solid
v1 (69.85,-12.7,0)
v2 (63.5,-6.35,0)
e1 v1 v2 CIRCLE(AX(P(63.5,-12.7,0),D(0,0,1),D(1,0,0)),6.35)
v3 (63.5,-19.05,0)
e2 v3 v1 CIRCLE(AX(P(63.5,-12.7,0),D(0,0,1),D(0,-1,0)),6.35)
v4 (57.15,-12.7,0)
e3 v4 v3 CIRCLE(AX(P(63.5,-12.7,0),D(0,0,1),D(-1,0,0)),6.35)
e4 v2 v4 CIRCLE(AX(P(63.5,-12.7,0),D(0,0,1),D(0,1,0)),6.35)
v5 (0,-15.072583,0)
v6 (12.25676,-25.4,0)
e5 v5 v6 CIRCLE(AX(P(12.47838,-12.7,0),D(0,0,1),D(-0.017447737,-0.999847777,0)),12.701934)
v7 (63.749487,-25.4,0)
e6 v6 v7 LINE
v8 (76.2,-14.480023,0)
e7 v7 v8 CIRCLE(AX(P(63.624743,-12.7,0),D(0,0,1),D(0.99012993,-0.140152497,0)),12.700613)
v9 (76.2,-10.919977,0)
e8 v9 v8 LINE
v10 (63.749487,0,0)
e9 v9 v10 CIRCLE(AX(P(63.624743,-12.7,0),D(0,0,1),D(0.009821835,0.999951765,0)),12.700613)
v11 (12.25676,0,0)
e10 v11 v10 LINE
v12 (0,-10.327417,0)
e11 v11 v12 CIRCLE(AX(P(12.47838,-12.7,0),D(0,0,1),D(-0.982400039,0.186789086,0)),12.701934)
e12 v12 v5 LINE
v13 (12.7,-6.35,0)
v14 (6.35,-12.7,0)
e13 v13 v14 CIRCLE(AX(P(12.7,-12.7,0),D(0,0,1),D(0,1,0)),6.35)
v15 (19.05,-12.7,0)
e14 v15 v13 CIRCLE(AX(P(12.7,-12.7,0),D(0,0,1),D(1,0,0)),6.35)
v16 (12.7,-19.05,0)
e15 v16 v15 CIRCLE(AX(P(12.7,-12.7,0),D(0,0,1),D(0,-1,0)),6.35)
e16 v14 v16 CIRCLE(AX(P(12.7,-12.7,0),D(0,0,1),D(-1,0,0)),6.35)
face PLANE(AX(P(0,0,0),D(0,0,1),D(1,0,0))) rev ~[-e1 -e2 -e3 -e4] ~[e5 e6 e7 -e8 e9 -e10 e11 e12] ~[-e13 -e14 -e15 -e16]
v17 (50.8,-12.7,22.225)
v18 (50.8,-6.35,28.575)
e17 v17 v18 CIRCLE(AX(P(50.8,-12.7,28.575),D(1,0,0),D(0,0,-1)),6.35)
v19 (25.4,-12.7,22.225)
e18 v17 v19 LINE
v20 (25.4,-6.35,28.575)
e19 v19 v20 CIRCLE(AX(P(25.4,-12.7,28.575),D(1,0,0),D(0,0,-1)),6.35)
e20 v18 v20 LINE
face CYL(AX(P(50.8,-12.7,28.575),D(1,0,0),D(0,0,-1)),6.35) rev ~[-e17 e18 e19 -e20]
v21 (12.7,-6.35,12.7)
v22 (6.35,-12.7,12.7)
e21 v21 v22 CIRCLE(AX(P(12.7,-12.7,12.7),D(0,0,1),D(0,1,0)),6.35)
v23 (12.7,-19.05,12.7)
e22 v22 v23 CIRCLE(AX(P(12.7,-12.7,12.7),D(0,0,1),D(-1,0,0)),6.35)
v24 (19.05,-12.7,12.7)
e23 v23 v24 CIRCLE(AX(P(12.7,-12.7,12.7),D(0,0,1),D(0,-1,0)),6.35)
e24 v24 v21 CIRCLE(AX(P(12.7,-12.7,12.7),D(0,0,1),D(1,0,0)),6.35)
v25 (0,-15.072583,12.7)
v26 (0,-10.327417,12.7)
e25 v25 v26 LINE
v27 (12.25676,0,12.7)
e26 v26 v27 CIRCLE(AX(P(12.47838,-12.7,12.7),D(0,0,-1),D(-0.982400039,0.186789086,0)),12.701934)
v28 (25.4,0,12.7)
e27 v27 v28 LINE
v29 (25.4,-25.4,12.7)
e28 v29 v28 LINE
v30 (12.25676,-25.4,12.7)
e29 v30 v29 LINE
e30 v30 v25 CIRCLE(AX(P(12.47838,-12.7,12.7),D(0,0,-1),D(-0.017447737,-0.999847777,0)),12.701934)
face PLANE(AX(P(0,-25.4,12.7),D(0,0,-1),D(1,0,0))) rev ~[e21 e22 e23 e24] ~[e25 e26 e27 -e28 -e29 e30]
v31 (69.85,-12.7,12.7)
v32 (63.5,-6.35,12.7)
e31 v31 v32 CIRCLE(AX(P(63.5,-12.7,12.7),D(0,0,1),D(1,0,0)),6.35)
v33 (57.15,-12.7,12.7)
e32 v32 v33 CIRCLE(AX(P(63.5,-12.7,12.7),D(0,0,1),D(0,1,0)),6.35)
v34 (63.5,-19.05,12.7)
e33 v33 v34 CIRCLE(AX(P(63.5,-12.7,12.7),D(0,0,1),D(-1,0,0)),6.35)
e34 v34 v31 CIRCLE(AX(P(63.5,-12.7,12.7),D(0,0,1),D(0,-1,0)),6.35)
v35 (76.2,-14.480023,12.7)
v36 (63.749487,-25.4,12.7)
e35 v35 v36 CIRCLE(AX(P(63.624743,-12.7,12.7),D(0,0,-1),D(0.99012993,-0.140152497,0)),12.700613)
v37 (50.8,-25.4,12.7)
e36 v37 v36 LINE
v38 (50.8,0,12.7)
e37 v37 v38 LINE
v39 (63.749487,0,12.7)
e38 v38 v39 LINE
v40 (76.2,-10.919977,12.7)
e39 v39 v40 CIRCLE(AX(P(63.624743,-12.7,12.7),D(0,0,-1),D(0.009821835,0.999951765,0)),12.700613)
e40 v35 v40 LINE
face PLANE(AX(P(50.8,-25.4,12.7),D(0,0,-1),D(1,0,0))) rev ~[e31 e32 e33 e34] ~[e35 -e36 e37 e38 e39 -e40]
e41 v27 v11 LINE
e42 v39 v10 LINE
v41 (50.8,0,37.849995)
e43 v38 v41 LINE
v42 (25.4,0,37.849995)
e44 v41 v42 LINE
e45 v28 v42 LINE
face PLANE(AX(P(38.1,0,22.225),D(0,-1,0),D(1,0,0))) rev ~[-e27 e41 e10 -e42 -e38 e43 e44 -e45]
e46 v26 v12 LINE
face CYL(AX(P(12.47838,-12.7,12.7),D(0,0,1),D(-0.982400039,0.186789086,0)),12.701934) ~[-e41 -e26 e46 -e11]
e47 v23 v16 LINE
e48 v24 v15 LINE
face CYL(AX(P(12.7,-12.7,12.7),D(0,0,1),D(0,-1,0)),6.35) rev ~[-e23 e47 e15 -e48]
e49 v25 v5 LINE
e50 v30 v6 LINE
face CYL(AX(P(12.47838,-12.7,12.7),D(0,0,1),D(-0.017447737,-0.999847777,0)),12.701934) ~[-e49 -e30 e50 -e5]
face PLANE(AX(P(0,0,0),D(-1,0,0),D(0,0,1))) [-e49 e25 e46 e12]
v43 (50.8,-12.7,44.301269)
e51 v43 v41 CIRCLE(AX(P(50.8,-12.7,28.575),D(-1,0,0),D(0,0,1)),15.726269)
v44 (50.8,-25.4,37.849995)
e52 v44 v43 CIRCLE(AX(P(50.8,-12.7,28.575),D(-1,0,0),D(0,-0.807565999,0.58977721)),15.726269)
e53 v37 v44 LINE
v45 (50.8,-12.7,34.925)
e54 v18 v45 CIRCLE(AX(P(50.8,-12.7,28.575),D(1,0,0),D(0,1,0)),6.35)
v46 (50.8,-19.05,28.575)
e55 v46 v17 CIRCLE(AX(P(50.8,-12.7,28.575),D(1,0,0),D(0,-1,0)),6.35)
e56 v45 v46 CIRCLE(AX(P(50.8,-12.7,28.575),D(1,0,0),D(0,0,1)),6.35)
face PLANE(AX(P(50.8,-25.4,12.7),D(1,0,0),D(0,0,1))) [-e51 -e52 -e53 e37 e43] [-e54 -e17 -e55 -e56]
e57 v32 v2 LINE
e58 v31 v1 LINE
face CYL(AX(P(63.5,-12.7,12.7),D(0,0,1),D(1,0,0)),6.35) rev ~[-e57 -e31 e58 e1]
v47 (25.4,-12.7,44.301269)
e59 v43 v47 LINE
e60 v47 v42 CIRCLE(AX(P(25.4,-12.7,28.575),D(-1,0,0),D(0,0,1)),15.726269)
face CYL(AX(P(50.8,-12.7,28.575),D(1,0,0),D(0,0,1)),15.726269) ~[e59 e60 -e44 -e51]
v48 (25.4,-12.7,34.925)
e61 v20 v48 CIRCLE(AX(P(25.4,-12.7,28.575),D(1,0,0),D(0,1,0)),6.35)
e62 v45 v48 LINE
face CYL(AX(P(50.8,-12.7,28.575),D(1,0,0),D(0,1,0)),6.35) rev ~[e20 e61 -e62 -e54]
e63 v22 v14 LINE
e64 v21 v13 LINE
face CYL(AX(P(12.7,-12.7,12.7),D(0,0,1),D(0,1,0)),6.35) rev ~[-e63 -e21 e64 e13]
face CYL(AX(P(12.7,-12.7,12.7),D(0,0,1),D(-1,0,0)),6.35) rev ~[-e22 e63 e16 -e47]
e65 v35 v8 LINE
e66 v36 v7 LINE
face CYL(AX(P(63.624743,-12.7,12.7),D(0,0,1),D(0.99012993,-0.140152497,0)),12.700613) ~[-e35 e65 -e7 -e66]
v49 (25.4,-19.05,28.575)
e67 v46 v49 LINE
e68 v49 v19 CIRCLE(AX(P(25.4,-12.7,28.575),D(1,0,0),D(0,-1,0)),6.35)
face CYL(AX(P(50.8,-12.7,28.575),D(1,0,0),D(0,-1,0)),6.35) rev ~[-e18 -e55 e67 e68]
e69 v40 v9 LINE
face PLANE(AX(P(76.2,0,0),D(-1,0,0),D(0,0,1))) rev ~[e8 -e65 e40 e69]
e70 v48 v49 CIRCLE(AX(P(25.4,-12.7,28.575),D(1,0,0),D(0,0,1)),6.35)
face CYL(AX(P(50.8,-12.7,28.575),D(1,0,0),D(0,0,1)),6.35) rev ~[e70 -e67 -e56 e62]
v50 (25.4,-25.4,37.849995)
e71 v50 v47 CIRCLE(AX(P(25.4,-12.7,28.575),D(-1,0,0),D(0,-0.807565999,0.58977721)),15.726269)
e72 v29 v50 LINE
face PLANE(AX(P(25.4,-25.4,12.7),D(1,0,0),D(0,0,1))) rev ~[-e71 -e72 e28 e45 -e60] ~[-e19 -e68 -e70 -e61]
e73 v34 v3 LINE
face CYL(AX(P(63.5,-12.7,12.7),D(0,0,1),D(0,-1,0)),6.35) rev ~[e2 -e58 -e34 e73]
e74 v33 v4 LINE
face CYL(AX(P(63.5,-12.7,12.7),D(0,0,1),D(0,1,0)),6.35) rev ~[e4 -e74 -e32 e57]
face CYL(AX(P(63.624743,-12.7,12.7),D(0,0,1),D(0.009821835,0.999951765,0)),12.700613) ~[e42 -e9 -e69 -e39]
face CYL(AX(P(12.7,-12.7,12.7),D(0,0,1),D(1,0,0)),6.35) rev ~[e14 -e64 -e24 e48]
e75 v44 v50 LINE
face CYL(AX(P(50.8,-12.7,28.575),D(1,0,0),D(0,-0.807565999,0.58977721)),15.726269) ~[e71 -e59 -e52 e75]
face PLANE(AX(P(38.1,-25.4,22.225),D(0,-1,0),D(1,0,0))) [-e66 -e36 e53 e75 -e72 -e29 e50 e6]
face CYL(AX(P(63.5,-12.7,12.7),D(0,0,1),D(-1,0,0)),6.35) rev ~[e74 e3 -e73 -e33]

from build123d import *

# Parameters (mm, degrees)
F0_W     = 76.2
F0_H     = 44.45
F1_DEPTH = 25.4
F2_W     = 25.4
F2_H     = 31.75
F3_DEPTH = 25.4
F5_DEPTH = 25.4
F7_DEPTH = 25.4
F9_DEPTH = 25.4


with BuildPart() as f1:
    # F0 (on Front) → F1 (new body)
    with BuildSketch(Plane.XZ):
        with Locations((38.1, 22.225)):
            Rectangle(F0_W, F0_H)
    extrude(amount=F1_DEPTH)

    # F2 (on face) → F3 (cut)
    with BuildSketch(Plane.XZ.offset(25.4)):
        with Locations((12.7, 28.575)):
            Rectangle(F2_W, F2_H)
        with Locations((63.5, 28.575)):
            Rectangle(F2_W, F2_H)
    extrude(amount=-F3_DEPTH, mode=Mode.SUBTRACT)

    # F4 (on face) → F5 (cut)
    with BuildSketch(Plane.YZ.offset(50.8)):
        with BuildLine():
            Line((-12.7, 28.575), (-12.7, 34.925))
            ThreePointArc((-12.7, 34.925), (-17.1901280605, 33.0651280605), (-19.05, 28.575))
            Line((-19.05, 28.575), (-12.7, 28.575))
        make_face()
        with BuildLine():
            ThreePointArc((-6.35, 28.575), (-8.2098719395, 33.0651280605), (-12.7, 34.925))
            Line((-12.7, 34.925), (-12.7, 28.575))
            Line((-12.7, 28.575), (-6.35, 28.575))
        make_face()
        with BuildLine():
            Line((-6.35, 28.575), (-12.7, 28.575))
            Line((-12.7, 28.575), (-12.7, 22.225))
            ThreePointArc((-12.7, 22.225), (-8.2098719395, 24.0848719395), (-6.35, 28.575))
        make_face()
        with BuildLine():
            Line((-12.7, 22.225), (-12.7, 28.575))
            Line((-12.7, 28.575), (-19.05, 28.575))
            ThreePointArc((-19.05, 28.575), (-17.1901280605, 24.0848719395), (-12.7, 22.225))
        make_face()
        with BuildLine():
            Line((-12.7, 44.3012688375), (-12.7, 44.45))
            Line((-12.7, 44.45), (-25.4, 44.45))
            Line((-25.4, 44.45), (-25.4, 37.8499949622))
            ThreePointArc((-25.4, 37.8499949622), (-19.8223053609, 42.5959948968), (-12.7, 44.3012688375))
        make_face()
        with BuildLine():
            Line((0, 44.45), (-12.7, 44.45))
            Line((-12.7, 44.45), (-12.7, 44.3012688375))
            ThreePointArc((-12.7, 44.3012688375), (-5.5776946391, 42.5959948968), (0, 37.8499949622))
            Line((0, 37.8499949622), (0, 44.45))
        make_face()
    extrude(amount=-F5_DEPTH, mode=Mode.SUBTRACT)

    # F6 (on face) → F7 (cut)
    with BuildSketch(Plane.XY.offset(12.7)):
        with BuildLine():
            Line((6.35, -12.7), (12.7, -12.7))
            Line((12.7, -12.7), (12.7, -6.35))
            ThreePointArc((12.7, -6.35), (8.2098719395, -8.2098719395), (6.35, -12.7))
        make_face()
        with BuildLine():
            Line((12.7, -12.7), (19.05, -12.7))
            ThreePointArc((19.05, -12.7), (17.1901280605, -8.2098719395), (12.7, -6.35))
            Line((12.7, -6.35), (12.7, -12.7))
        make_face()
        with BuildLine():
            Line((12.7, -19.05), (12.7, -12.7))
            Line((12.7, -12.7), (6.35, -12.7))
            ThreePointArc((6.35, -12.7), (8.2098719395, -17.1901280605), (12.7, -19.05))
        make_face()
        with BuildLine():
            ThreePointArc((12.7, -19.05), (17.1901280605, -17.1901280605), (19.05, -12.7))
            Line((19.05, -12.7), (12.7, -12.7))
            Line((12.7, -12.7), (12.7, -19.05))
        make_face()
        with BuildLine():
            ThreePointArc((0, -10.327417444), (4.2938587705, -2.9864667778), (12.2567600012, 0))
            Line((12.2567600012, 0), (0, 0))
            Line((0, 0), (0, -10.327417444))
        make_face()
        with BuildLine():
            Line((0, -25.4), (12.2567600012, -25.4))
            ThreePointArc((12.2567600012, -25.4), (4.2938587705, -22.4135332222), (0, -15.072582556))
            Line((0, -15.072582556), (0, -25.4))
        make_face()
    extrude(amount=-F7_DEPTH, mode=Mode.SUBTRACT)

    # F8 (on face) → F9 (cut)
    with BuildSketch(Plane.XY.offset(12.7)):
        with BuildLine():
            ThreePointArc((63.5, -19.05), (67.9901280605, -17.1901280605), (69.85, -12.7))
            Line((69.85, -12.7), (63.5, -12.7))
            Line((63.5, -12.7), (63.5, -19.05))
        make_face()
        with BuildLine():
            Line((63.5, -12.7), (69.85, -12.7))
            ThreePointArc((69.85, -12.7), (67.9901280605, -8.2098719395), (63.5, -6.35))
            Line((63.5, -6.35), (63.5, -12.7))
        make_face()
        with BuildLine():
            Line((63.5, -19.05), (63.5, -12.7))
            Line((63.5, -12.7), (57.15, -12.7))
            ThreePointArc((57.15, -12.7), (59.0098719395, -17.1901280605), (63.5, -19.05))
        make_face()
        with BuildLine():
            Line((57.15, -12.7), (63.5, -12.7))
            Line((63.5, -12.7), (63.5, -6.35))
            ThreePointArc((63.5, -6.35), (59.0098719395, -8.2098719395), (57.15, -12.7))
        make_face()
        with BuildLine():
            Line((76.2, -25.4), (76.2, -14.4800225697))
            ThreePointArc((76.2, -14.4800225697), (71.9993464021, -22.2483812307), (63.7494866416, -25.4))
            Line((63.7494866416, -25.4), (76.2, -25.4))
        make_face()
        with BuildLine():
            ThreePointArc((63.7494866416, 0), (71.9993464021, -3.1516187693), (76.2, -10.9199774303))
            Line((76.2, -10.9199774303), (76.2, 0))
            Line((76.2, 0), (63.7494866416, 0))
        make_face()
    extrude(amount=-F9_DEPTH, mode=Mode.SUBTRACT)


solid = f1.part
